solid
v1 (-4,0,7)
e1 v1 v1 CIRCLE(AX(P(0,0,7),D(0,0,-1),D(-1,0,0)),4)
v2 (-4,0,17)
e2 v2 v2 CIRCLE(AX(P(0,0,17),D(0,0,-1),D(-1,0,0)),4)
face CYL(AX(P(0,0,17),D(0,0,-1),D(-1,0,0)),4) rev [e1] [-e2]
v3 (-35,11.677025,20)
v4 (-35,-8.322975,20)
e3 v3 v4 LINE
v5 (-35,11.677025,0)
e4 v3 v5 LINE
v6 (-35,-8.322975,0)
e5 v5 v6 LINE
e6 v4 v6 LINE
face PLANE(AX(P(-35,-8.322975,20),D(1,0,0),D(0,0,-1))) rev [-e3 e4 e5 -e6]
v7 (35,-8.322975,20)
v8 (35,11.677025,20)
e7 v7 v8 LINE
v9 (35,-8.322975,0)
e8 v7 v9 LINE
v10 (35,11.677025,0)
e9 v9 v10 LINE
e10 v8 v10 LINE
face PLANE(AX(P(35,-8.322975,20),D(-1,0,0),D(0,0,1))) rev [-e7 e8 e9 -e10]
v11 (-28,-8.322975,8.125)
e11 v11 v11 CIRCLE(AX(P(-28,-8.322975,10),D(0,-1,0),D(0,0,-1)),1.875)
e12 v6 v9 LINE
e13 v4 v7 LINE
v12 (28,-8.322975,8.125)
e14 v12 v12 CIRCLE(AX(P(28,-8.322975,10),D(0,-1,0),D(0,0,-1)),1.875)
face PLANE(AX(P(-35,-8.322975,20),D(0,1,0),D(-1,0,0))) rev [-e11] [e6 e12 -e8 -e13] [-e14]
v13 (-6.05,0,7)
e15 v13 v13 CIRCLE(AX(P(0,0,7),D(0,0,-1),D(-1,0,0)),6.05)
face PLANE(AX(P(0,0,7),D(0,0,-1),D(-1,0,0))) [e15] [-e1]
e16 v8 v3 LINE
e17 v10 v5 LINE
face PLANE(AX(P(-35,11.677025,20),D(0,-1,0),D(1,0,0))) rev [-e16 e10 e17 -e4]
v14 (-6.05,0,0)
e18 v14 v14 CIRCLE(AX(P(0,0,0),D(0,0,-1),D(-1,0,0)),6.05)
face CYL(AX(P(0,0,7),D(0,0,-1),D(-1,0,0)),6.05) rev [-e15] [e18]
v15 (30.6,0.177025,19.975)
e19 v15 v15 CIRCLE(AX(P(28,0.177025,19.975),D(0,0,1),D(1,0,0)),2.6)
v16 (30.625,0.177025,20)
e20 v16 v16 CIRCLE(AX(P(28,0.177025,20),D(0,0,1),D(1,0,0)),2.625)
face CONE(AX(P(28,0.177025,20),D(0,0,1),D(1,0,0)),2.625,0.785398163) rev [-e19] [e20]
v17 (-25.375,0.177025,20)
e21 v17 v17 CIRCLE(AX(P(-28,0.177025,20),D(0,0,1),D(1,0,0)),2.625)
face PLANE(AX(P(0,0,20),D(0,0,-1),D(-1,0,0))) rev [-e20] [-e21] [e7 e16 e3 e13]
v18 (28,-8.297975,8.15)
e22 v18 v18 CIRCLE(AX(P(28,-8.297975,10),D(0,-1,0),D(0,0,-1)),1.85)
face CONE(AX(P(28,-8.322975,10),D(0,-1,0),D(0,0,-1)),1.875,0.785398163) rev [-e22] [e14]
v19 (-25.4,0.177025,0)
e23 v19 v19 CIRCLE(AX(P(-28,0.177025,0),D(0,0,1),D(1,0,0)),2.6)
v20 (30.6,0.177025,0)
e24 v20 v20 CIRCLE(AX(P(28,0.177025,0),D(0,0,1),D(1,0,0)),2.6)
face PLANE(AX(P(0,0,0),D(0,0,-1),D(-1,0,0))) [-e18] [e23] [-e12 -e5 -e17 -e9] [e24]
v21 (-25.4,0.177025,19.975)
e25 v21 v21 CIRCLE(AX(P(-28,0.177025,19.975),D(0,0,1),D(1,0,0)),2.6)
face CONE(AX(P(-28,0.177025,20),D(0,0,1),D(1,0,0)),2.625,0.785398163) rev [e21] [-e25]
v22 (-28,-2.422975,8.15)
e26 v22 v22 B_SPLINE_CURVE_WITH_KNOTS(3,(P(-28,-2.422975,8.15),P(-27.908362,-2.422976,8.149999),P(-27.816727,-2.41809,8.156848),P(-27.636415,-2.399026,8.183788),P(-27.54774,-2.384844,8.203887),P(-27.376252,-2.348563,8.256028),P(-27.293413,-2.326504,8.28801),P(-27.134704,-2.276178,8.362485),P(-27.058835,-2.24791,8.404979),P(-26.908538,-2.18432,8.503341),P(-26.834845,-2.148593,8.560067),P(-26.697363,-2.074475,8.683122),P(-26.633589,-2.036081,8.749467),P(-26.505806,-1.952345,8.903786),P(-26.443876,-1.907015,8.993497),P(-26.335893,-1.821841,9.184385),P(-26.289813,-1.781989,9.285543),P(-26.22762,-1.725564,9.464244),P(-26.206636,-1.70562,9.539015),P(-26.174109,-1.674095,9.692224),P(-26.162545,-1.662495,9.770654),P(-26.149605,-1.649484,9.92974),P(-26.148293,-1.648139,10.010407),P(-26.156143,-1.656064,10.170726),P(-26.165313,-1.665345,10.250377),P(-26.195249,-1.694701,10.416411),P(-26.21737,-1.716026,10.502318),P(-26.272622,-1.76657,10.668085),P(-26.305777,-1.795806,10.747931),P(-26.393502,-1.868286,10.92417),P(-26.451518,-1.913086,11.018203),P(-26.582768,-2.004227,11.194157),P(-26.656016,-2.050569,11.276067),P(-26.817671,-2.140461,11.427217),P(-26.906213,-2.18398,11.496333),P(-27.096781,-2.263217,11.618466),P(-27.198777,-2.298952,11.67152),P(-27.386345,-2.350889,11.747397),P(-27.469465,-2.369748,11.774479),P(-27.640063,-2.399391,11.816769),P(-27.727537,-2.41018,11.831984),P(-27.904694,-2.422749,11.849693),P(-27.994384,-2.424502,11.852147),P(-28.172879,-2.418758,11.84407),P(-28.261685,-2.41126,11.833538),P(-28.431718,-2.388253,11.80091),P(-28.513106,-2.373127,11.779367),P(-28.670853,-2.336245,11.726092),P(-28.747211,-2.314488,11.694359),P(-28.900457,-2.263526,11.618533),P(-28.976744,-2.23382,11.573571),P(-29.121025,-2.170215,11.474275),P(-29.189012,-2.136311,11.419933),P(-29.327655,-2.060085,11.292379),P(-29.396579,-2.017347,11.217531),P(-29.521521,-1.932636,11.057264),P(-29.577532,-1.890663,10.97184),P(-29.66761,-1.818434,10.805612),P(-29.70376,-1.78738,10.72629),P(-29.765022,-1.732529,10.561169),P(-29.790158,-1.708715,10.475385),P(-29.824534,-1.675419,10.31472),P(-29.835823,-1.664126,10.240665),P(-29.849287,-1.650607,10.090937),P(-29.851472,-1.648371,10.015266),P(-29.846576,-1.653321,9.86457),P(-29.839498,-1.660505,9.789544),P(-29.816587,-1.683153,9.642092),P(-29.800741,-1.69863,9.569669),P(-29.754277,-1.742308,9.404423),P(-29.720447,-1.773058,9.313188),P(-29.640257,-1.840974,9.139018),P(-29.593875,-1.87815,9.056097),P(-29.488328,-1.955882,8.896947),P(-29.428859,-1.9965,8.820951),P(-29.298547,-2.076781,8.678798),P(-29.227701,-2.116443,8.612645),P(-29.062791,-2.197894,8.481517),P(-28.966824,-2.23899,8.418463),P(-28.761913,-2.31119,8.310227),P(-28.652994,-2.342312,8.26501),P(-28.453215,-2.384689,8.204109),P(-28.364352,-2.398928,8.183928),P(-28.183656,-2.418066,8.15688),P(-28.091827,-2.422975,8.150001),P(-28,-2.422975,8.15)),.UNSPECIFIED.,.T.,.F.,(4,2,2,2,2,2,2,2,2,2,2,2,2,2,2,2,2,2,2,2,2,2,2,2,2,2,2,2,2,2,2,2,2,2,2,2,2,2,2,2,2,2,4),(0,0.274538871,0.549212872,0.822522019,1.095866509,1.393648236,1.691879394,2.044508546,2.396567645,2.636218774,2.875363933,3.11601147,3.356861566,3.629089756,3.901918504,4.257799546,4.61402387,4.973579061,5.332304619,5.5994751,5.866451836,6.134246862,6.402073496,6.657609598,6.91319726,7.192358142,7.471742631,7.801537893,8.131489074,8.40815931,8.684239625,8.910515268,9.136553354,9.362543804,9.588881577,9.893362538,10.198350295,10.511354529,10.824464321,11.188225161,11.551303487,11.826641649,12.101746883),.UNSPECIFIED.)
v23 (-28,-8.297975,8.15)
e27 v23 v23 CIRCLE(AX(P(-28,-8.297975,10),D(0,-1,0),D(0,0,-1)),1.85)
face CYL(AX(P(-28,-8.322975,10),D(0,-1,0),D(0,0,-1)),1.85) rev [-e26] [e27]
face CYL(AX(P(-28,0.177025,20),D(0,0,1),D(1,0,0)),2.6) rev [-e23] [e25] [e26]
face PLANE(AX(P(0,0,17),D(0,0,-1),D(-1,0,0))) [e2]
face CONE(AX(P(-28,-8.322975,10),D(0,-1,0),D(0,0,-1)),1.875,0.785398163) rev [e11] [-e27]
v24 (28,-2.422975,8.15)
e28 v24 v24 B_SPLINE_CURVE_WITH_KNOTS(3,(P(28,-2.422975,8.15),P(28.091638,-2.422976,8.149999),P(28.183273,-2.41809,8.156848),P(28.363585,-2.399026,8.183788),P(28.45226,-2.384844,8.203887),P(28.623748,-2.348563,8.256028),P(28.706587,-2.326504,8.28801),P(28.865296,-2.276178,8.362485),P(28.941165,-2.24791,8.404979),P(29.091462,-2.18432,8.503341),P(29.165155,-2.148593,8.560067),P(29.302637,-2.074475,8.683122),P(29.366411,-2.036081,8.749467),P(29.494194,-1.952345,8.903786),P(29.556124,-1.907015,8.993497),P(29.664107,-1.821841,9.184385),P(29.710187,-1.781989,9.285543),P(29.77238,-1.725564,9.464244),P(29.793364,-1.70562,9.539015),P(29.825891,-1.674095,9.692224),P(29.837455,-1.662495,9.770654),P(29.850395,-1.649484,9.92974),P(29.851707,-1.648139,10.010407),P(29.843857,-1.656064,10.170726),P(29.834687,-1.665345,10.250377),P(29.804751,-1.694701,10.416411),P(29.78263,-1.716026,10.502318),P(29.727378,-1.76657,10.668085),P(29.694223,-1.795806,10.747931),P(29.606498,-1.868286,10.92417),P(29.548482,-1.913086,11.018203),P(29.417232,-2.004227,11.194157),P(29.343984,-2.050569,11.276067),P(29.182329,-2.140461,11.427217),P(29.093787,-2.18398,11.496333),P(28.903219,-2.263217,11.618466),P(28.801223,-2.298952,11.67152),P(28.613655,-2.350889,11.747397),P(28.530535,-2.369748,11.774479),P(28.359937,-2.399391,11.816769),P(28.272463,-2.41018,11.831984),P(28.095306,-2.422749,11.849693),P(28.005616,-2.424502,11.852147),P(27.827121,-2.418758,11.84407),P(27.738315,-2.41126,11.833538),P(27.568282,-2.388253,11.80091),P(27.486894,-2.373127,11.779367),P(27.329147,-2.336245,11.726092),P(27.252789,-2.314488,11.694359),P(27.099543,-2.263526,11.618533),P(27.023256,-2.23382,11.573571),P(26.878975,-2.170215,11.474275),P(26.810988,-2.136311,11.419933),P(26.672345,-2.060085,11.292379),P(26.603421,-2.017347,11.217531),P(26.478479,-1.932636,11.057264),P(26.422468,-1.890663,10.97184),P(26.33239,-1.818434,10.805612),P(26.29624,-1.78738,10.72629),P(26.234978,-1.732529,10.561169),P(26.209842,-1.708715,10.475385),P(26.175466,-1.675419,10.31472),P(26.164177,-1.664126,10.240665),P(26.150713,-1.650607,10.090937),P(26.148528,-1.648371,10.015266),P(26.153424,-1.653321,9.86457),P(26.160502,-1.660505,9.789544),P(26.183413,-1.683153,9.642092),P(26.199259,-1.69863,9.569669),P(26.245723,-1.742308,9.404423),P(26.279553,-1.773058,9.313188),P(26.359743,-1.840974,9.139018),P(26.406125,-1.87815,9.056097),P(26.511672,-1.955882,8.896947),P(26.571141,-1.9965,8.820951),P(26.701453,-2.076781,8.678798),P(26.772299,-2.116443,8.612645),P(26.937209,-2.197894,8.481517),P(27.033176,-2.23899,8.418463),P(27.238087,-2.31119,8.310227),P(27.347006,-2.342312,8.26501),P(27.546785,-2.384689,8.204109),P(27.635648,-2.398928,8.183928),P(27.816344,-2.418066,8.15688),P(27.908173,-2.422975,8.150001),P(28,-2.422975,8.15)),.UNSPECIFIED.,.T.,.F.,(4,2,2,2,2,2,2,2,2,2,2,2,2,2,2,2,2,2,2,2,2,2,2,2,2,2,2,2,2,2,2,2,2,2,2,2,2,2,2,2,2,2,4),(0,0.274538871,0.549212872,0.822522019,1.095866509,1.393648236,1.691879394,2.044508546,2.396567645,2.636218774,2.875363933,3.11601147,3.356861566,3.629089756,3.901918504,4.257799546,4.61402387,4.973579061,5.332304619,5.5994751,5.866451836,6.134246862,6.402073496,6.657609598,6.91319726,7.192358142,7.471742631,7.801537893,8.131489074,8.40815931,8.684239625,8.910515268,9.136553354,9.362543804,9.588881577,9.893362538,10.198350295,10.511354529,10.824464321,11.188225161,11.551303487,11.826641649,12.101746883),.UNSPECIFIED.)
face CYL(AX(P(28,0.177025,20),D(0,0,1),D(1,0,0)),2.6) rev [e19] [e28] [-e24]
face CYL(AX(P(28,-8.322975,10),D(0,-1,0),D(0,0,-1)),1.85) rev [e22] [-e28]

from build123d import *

# Parameters (mm, degrees)
SKIZZE1_W                                  = 70
SKIZZE1_H                                  = 20
AUFSATZ_LINEAR_AUSTRAGEN1_DEPTH            = 20
F_5_2_5_2_DURCHMESSER_BOHRUNG1_D           = 5.2
F_5_2_5_2_DURCHMESSER_BOHRUNG1_CSINK_D     = 5.25
F_5_2_5_2_DURCHMESSER_BOHRUNG1_CSINK_ANGLE = 90
SKIZZE21_R                                 = 6.05
SCHNITT_LINEAR_AUSTRAGEN3_DEPTH            = 7
SKIZZE22_R                                 = 4
SCHNITT_LINEAR_AUSTRAGEN5_DEPTH            = 10


# Read off the part's stored shape, not the designer's step: Durchgangsloch für M3.51
with BuildPart() as part:
    # Skizze1 → Aufsatz-Linear austragen1 (new body)
    with BuildSketch(Plane.XY):
        with Locations((0, 1.677024639)):
            Rectangle(SKIZZE1_W, SKIZZE1_H)
    extrude(amount=AUFSATZ_LINEAR_AUSTRAGEN1_DEPTH)

    # Ø5.2 (5.2) Durchmesser Bohrung1 (through all)
    with Locations(Plane.XY.offset(20)):
        with Locations((-28, 0.177024639), (28, 0.177024639)):
            CounterSinkHole(F_5_2_5_2_DURCHMESSER_BOHRUNG1_D / 2, F_5_2_5_2_DURCHMESSER_BOHRUNG1_CSINK_D / 2, counter_sink_angle=F_5_2_5_2_DURCHMESSER_BOHRUNG1_CSINK_ANGLE)

    # Durchgangsloch für M3.51 outline → Durchgangsloch für M3.51 (revolve, cut)
    with BuildSketch(Plane(origin=(-28, 0, 10), x_dir=(1, 0, 0), z_dir=(0, 0, 1))):
        Polygon((1.85, -8.297975361), (1.85, -1.649435315), (0, -1.649435315), (0, -8.322975361), (1.875, -8.322975361), align=None)
    revolve(axis=Axis((-28, 0, 10), (0, 1, 0)), mode=Mode.SUBTRACT)

    # Durchgangsloch f_r M3.51 2 outline → Durchgangsloch f_r M3.51 2 (revolve, cut)
    with BuildSketch(Plane(origin=(28, 0, 10), x_dir=(1, 0, 0), z_dir=(0, 0, 1))):
        Polygon((1.85, -8.297975361), (1.85, -1.649435315), (0, -1.649435315), (0, -8.322975361), (1.875, -8.322975361), align=None)
    revolve(axis=Axis((28, 0, 10), (0, 1, 0)), mode=Mode.SUBTRACT)

    # Skizze21 → Schnitt-Linear austragen3 (cut)
    with BuildSketch(Plane(origin=(0, 0, 0), x_dir=(-1, 0, 0), z_dir=(0, 0, -1))):
        Circle(SKIZZE21_R)
    extrude(amount=-SCHNITT_LINEAR_AUSTRAGEN3_DEPTH, mode=Mode.SUBTRACT)

    # Skizze22 → Schnitt-Linear austragen5 (cut)
    with BuildSketch(Plane(origin=(0, 0, 7), x_dir=(-1, 0, 0), z_dir=(0, 0, -1))):
        Circle(SKIZZE22_R)
    extrude(amount=-SCHNITT_LINEAR_AUSTRAGEN5_DEPTH, mode=Mode.SUBTRACT)


solid = part.part
